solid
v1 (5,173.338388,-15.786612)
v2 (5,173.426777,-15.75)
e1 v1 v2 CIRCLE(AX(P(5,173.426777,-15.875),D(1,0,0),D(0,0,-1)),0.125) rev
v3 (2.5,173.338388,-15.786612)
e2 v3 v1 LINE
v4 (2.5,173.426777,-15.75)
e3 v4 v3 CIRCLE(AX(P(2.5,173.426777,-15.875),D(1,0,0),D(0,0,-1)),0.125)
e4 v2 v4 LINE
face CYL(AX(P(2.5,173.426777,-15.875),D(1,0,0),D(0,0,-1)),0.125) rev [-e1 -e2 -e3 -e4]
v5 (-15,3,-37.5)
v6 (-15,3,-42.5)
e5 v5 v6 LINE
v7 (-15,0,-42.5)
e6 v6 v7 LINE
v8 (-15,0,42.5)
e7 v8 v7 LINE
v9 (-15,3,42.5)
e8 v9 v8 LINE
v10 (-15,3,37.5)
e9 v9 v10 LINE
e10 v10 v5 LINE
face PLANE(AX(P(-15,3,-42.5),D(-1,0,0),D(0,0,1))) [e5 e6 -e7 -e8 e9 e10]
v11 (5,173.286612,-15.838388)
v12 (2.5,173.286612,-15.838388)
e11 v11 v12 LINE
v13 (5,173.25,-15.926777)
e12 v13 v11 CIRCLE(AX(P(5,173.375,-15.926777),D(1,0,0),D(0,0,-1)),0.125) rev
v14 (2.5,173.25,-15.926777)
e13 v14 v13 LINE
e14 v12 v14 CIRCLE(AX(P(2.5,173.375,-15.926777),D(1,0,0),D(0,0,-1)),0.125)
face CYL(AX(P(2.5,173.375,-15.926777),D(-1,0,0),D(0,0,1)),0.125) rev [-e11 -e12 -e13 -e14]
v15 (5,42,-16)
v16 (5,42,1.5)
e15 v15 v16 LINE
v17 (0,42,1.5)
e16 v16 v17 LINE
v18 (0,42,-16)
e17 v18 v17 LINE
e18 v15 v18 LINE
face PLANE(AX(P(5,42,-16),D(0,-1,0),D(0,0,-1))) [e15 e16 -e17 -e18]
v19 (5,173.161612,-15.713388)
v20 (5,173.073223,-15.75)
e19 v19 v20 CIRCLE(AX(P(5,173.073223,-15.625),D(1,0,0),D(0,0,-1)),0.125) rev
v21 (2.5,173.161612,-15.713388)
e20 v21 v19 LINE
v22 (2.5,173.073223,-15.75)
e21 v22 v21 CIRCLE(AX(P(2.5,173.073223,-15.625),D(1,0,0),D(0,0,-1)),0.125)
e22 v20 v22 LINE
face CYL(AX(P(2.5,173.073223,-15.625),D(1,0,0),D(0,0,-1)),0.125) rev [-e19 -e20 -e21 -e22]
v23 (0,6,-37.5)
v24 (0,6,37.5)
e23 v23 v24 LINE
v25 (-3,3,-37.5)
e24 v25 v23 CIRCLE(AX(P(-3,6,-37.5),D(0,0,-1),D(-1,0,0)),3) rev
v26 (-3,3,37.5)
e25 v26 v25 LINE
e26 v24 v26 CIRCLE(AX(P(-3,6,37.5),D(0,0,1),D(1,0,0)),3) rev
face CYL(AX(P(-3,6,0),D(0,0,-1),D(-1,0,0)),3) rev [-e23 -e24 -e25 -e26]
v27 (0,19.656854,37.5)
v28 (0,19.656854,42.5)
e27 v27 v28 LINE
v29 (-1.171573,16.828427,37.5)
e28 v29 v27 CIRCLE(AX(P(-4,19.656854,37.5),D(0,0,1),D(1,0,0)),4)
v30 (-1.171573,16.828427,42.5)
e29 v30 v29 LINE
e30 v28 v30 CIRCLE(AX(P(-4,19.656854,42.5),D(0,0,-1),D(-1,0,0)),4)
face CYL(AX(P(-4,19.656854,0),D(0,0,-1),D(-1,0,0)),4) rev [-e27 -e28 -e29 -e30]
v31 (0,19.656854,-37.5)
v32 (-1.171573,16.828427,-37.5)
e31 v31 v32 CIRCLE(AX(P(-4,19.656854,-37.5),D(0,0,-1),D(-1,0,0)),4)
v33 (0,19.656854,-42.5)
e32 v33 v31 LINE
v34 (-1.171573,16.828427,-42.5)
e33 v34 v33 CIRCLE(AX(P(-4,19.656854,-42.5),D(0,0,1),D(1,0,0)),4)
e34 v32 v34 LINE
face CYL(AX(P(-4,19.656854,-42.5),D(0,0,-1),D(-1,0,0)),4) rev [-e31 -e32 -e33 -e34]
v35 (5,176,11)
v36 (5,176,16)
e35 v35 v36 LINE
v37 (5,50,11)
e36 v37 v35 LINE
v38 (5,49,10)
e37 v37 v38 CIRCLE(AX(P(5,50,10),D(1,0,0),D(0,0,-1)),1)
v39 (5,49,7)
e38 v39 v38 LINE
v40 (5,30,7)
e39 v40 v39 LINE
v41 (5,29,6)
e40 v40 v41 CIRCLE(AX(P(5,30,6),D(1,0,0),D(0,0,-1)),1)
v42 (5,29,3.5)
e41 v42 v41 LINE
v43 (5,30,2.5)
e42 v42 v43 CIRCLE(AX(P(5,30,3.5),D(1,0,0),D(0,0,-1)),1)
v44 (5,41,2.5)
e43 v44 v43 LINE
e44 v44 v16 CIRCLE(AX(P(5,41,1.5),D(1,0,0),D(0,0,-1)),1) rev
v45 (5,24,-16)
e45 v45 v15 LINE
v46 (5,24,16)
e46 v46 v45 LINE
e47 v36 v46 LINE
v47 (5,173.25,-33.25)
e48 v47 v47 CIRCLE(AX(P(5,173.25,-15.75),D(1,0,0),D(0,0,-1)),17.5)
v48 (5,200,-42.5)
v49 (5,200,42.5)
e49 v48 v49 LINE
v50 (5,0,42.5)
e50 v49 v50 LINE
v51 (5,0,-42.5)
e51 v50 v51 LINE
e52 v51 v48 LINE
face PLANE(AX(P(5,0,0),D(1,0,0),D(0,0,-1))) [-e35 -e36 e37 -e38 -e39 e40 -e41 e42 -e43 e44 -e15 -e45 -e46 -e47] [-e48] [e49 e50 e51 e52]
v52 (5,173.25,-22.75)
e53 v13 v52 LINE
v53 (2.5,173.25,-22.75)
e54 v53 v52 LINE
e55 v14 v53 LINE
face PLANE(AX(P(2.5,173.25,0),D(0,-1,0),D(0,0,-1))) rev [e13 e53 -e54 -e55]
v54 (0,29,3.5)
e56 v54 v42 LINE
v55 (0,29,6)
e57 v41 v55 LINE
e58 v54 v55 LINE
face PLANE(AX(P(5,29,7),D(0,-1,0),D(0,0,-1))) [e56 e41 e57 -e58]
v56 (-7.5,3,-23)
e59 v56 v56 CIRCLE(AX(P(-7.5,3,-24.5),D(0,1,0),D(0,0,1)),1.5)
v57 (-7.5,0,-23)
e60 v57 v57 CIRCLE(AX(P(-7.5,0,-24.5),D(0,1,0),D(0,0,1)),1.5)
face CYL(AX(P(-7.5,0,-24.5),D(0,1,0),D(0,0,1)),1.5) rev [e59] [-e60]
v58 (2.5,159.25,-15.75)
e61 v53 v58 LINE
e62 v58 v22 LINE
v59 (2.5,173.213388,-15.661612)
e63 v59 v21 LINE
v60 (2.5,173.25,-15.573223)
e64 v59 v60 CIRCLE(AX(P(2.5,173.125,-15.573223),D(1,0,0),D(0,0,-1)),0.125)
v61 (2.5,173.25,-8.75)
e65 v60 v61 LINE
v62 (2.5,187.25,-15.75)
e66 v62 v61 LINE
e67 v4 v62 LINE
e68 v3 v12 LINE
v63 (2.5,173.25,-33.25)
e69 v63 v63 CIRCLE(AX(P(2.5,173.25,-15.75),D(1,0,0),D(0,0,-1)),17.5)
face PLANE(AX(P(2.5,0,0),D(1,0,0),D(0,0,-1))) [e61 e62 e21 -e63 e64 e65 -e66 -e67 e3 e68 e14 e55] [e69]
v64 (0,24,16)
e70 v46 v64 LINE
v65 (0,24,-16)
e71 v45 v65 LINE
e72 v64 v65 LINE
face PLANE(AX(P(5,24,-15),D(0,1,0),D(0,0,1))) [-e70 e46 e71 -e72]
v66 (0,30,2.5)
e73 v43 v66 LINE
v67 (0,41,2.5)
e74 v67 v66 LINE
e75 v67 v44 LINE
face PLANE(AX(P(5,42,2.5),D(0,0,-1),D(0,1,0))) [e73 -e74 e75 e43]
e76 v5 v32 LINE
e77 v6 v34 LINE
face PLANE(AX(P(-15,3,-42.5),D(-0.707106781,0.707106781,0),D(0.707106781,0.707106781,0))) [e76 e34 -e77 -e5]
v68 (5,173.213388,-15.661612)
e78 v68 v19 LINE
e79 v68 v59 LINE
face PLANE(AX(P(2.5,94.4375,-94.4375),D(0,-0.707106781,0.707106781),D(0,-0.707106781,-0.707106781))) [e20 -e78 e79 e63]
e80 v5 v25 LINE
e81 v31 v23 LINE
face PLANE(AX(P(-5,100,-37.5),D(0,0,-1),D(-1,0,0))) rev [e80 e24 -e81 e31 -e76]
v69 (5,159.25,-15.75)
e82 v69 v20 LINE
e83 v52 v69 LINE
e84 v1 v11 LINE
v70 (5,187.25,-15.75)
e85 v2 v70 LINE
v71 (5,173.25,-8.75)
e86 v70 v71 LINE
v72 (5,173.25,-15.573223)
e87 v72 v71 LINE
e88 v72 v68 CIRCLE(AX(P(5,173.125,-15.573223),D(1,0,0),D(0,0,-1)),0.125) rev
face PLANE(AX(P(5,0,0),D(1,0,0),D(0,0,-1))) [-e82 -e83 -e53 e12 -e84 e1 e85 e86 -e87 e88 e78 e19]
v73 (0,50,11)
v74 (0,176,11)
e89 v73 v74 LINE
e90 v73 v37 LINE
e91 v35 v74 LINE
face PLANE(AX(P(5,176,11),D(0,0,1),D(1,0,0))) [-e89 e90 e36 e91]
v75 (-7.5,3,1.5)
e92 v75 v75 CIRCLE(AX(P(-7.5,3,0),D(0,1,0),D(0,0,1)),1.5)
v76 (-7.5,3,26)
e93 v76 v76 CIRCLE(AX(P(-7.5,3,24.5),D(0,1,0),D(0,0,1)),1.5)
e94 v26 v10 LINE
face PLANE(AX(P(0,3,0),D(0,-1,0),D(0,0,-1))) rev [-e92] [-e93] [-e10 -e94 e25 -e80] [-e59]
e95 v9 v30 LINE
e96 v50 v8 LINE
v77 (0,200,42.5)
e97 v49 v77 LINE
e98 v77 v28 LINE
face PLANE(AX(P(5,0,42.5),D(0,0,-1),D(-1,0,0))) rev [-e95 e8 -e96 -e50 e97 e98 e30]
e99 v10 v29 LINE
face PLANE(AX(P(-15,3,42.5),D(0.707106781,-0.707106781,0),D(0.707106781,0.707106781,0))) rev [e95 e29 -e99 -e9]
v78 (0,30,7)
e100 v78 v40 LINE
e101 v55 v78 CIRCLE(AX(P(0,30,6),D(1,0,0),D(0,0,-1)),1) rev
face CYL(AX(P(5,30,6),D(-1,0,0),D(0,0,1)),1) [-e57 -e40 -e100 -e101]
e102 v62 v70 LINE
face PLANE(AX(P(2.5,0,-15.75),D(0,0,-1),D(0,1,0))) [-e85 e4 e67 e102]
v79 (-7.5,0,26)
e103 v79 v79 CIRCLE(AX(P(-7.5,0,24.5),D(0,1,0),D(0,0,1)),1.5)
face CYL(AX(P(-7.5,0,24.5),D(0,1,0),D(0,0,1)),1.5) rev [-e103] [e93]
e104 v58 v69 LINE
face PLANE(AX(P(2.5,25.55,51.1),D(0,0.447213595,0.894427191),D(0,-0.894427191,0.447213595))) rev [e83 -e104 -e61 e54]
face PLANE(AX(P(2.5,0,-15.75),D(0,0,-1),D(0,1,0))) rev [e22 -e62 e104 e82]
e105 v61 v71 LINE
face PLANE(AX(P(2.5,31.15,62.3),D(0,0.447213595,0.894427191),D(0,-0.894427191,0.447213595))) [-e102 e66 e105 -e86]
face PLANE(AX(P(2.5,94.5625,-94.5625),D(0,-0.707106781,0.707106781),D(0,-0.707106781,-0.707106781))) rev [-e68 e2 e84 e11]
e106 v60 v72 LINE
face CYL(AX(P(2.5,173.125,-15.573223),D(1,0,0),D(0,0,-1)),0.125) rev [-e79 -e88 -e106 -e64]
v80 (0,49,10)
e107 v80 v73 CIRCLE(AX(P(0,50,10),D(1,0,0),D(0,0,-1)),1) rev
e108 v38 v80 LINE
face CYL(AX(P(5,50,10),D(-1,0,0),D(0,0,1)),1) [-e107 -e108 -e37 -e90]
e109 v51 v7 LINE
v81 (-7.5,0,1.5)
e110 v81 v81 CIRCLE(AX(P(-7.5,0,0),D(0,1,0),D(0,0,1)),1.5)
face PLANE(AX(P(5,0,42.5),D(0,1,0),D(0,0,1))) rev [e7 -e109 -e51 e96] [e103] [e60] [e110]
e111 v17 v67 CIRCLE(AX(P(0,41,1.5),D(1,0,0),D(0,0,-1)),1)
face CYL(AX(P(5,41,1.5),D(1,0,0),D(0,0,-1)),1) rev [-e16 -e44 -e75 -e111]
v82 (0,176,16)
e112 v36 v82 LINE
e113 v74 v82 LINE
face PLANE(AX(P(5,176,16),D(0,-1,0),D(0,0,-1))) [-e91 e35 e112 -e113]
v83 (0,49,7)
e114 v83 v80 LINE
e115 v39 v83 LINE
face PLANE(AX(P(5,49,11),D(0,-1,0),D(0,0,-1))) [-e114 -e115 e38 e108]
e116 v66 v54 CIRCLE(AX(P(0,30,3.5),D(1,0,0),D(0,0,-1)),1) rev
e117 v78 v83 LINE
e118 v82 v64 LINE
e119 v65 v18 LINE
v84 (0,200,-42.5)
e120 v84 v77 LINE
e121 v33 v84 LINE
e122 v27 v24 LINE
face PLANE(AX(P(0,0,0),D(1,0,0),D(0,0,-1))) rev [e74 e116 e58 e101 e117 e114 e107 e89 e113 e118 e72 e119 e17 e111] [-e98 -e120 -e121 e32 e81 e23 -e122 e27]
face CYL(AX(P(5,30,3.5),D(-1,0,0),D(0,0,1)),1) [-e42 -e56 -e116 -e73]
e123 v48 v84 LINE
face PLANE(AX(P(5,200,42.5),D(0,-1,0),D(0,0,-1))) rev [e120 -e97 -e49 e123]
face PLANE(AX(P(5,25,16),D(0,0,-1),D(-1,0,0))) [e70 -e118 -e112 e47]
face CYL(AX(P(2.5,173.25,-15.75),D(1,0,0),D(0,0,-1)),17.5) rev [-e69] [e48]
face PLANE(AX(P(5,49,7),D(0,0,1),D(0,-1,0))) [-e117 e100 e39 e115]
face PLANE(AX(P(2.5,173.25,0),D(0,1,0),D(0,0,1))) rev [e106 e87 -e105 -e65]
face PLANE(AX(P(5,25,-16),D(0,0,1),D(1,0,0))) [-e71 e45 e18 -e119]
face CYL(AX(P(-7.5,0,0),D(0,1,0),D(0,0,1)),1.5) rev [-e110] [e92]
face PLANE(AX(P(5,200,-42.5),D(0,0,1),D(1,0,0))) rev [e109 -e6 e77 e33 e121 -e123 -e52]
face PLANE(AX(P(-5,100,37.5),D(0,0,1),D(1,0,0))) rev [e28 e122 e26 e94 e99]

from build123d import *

# Parameters (mm, degrees)
SKETCH1_W           = 85
SKETCH1_H           = 200
BOSS_EXTRUDE1_DEPTH = 5
FILLET1_R           = 1
SKETCH2_R           = 17.5
CUT_EXTRUDE1_DEPTH  = 2.5
FILLET2_R           = 0.125
SKETCH3_W           = 15
SKETCH3_H           = 85
BOSS_EXTRUDE2_DEPTH = 3
RIB1_START          = -5
RIB1_DEPTH          = 5
SKETCH5_R           = 1.5
CUT_EXTRUDE2_DEPTH  = 3
FILLET3_R           = 4
FILLET4_R           = 3


# Read off the part's stored shape, not the designer's step: Rib1
with BuildPart() as part:
    # Sketch1 → Boss-Extrude1 (new body)
    with BuildSketch(Plane(origin=(0, 0, 0), x_dir=(0, 0, -1), z_dir=(1, 0, 0))):
        with Locations((0, 100)):
            Rectangle(SKETCH1_W, SKETCH1_H)
        Polygon((-16, 25), (-16, 176), (-11, 176), (-11, 49), (-7, 49), (-7, 29), (-2.5, 29), (-2.5, 42), (16, 42), (16, 25), (16, 24), (15, 24), (-15, 24), (-16, 24), align=None, mode=Mode.SUBTRACT)
    extrude(amount=BOSS_EXTRUDE1_DEPTH)

    # Fillet1
    fillet1_edges = [part.edges().sort_by_distance(p)[0] for p in [
        (2.5, 42, 2.5),
        (2.5, 29, 2.5),
        (2.5, 29, 7),
        (2.5, 49, 11),
    ]]
    fillet(fillet1_edges, radius=FILLET1_R)

    # Sketch2 → Cut-Extrude1 (cut)
    with BuildSketch(Plane(origin=(5, 0, 0), x_dir=(0, 0, -1), z_dir=(1, 0, 0))):
        with Locations((15.75, 173.25)):
            Circle(SKETCH2_R)
        Polygon((15.75, 173.125), (15.625, 173.25), (8.75, 173.25), (15.75, 187.25), (15.75, 173.375), (15.875, 173.25), (22.75, 173.25), (15.75, 159.25), align=None, mode=Mode.SUBTRACT)
    extrude(amount=-CUT_EXTRUDE1_DEPTH, mode=Mode.SUBTRACT)

    # Fillet2
    fillet2_edges = [part.edges().sort_by_distance(p)[0] for p in [
        (3.75, 173.25, -15.625),
        (3.75, 173.125, -15.75),
        (3.75, 173.25, -15.875),
        (3.75, 173.375, -15.75),
    ]]
    fillet(fillet2_edges, radius=FILLET2_R)

    # Sketch3 → Boss-Extrude2 (add)
    with BuildSketch(Plane.XZ):
        with Locations((-7.5, 0)):
            Rectangle(SKETCH3_W, SKETCH3_H)
    extrude(amount=-BOSS_EXTRUDE2_DEPTH)

    # Rib1 outline → Rib1 (add)
    with BuildSketch(Plane.XY.offset(42.5).offset(RIB1_START)):
        Polygon((0, 18), (-15, 3), (0, 3), align=None)
    rib1 = extrude(amount=RIB1_DEPTH)

    # Mirror1: Rib1 across plane
    add(rib1.mirror(Plane.XY))

    # Sketch5 → Cut-Extrude2 (cut)
    with BuildSketch(Plane(origin=(0, 3, 0), x_dir=(1, 0, 0), z_dir=(0, 1, 0))):
        with Locations(Location((-7.5, 24.5, 0), (0, 0, 270))):
            Circle(SKETCH5_R)
        with Locations(Location((-7.5, 0, 0), (0, 0, 270))):
            Circle(SKETCH5_R)
        with Locations(Location((-7.5, -24.5, 0), (0, 0, 270))):
            Circle(SKETCH5_R)
    extrude(amount=-CUT_EXTRUDE2_DEPTH, mode=Mode.SUBTRACT)

    # Fillet3
    fillet3_edges = [part.edges().sort_by_distance(p)[0] for p in [
        (0, 18, 40),
        (0, 18, -40),
    ]]
    fillet(fillet3_edges, radius=FILLET3_R)

    # Fillet4
    fillet4_edges = [part.edges().sort_by_distance(p)[0] for p in [
        (0, 3, 0),
    ]]
    fillet(fillet4_edges, radius=FILLET4_R)


solid = part.part
